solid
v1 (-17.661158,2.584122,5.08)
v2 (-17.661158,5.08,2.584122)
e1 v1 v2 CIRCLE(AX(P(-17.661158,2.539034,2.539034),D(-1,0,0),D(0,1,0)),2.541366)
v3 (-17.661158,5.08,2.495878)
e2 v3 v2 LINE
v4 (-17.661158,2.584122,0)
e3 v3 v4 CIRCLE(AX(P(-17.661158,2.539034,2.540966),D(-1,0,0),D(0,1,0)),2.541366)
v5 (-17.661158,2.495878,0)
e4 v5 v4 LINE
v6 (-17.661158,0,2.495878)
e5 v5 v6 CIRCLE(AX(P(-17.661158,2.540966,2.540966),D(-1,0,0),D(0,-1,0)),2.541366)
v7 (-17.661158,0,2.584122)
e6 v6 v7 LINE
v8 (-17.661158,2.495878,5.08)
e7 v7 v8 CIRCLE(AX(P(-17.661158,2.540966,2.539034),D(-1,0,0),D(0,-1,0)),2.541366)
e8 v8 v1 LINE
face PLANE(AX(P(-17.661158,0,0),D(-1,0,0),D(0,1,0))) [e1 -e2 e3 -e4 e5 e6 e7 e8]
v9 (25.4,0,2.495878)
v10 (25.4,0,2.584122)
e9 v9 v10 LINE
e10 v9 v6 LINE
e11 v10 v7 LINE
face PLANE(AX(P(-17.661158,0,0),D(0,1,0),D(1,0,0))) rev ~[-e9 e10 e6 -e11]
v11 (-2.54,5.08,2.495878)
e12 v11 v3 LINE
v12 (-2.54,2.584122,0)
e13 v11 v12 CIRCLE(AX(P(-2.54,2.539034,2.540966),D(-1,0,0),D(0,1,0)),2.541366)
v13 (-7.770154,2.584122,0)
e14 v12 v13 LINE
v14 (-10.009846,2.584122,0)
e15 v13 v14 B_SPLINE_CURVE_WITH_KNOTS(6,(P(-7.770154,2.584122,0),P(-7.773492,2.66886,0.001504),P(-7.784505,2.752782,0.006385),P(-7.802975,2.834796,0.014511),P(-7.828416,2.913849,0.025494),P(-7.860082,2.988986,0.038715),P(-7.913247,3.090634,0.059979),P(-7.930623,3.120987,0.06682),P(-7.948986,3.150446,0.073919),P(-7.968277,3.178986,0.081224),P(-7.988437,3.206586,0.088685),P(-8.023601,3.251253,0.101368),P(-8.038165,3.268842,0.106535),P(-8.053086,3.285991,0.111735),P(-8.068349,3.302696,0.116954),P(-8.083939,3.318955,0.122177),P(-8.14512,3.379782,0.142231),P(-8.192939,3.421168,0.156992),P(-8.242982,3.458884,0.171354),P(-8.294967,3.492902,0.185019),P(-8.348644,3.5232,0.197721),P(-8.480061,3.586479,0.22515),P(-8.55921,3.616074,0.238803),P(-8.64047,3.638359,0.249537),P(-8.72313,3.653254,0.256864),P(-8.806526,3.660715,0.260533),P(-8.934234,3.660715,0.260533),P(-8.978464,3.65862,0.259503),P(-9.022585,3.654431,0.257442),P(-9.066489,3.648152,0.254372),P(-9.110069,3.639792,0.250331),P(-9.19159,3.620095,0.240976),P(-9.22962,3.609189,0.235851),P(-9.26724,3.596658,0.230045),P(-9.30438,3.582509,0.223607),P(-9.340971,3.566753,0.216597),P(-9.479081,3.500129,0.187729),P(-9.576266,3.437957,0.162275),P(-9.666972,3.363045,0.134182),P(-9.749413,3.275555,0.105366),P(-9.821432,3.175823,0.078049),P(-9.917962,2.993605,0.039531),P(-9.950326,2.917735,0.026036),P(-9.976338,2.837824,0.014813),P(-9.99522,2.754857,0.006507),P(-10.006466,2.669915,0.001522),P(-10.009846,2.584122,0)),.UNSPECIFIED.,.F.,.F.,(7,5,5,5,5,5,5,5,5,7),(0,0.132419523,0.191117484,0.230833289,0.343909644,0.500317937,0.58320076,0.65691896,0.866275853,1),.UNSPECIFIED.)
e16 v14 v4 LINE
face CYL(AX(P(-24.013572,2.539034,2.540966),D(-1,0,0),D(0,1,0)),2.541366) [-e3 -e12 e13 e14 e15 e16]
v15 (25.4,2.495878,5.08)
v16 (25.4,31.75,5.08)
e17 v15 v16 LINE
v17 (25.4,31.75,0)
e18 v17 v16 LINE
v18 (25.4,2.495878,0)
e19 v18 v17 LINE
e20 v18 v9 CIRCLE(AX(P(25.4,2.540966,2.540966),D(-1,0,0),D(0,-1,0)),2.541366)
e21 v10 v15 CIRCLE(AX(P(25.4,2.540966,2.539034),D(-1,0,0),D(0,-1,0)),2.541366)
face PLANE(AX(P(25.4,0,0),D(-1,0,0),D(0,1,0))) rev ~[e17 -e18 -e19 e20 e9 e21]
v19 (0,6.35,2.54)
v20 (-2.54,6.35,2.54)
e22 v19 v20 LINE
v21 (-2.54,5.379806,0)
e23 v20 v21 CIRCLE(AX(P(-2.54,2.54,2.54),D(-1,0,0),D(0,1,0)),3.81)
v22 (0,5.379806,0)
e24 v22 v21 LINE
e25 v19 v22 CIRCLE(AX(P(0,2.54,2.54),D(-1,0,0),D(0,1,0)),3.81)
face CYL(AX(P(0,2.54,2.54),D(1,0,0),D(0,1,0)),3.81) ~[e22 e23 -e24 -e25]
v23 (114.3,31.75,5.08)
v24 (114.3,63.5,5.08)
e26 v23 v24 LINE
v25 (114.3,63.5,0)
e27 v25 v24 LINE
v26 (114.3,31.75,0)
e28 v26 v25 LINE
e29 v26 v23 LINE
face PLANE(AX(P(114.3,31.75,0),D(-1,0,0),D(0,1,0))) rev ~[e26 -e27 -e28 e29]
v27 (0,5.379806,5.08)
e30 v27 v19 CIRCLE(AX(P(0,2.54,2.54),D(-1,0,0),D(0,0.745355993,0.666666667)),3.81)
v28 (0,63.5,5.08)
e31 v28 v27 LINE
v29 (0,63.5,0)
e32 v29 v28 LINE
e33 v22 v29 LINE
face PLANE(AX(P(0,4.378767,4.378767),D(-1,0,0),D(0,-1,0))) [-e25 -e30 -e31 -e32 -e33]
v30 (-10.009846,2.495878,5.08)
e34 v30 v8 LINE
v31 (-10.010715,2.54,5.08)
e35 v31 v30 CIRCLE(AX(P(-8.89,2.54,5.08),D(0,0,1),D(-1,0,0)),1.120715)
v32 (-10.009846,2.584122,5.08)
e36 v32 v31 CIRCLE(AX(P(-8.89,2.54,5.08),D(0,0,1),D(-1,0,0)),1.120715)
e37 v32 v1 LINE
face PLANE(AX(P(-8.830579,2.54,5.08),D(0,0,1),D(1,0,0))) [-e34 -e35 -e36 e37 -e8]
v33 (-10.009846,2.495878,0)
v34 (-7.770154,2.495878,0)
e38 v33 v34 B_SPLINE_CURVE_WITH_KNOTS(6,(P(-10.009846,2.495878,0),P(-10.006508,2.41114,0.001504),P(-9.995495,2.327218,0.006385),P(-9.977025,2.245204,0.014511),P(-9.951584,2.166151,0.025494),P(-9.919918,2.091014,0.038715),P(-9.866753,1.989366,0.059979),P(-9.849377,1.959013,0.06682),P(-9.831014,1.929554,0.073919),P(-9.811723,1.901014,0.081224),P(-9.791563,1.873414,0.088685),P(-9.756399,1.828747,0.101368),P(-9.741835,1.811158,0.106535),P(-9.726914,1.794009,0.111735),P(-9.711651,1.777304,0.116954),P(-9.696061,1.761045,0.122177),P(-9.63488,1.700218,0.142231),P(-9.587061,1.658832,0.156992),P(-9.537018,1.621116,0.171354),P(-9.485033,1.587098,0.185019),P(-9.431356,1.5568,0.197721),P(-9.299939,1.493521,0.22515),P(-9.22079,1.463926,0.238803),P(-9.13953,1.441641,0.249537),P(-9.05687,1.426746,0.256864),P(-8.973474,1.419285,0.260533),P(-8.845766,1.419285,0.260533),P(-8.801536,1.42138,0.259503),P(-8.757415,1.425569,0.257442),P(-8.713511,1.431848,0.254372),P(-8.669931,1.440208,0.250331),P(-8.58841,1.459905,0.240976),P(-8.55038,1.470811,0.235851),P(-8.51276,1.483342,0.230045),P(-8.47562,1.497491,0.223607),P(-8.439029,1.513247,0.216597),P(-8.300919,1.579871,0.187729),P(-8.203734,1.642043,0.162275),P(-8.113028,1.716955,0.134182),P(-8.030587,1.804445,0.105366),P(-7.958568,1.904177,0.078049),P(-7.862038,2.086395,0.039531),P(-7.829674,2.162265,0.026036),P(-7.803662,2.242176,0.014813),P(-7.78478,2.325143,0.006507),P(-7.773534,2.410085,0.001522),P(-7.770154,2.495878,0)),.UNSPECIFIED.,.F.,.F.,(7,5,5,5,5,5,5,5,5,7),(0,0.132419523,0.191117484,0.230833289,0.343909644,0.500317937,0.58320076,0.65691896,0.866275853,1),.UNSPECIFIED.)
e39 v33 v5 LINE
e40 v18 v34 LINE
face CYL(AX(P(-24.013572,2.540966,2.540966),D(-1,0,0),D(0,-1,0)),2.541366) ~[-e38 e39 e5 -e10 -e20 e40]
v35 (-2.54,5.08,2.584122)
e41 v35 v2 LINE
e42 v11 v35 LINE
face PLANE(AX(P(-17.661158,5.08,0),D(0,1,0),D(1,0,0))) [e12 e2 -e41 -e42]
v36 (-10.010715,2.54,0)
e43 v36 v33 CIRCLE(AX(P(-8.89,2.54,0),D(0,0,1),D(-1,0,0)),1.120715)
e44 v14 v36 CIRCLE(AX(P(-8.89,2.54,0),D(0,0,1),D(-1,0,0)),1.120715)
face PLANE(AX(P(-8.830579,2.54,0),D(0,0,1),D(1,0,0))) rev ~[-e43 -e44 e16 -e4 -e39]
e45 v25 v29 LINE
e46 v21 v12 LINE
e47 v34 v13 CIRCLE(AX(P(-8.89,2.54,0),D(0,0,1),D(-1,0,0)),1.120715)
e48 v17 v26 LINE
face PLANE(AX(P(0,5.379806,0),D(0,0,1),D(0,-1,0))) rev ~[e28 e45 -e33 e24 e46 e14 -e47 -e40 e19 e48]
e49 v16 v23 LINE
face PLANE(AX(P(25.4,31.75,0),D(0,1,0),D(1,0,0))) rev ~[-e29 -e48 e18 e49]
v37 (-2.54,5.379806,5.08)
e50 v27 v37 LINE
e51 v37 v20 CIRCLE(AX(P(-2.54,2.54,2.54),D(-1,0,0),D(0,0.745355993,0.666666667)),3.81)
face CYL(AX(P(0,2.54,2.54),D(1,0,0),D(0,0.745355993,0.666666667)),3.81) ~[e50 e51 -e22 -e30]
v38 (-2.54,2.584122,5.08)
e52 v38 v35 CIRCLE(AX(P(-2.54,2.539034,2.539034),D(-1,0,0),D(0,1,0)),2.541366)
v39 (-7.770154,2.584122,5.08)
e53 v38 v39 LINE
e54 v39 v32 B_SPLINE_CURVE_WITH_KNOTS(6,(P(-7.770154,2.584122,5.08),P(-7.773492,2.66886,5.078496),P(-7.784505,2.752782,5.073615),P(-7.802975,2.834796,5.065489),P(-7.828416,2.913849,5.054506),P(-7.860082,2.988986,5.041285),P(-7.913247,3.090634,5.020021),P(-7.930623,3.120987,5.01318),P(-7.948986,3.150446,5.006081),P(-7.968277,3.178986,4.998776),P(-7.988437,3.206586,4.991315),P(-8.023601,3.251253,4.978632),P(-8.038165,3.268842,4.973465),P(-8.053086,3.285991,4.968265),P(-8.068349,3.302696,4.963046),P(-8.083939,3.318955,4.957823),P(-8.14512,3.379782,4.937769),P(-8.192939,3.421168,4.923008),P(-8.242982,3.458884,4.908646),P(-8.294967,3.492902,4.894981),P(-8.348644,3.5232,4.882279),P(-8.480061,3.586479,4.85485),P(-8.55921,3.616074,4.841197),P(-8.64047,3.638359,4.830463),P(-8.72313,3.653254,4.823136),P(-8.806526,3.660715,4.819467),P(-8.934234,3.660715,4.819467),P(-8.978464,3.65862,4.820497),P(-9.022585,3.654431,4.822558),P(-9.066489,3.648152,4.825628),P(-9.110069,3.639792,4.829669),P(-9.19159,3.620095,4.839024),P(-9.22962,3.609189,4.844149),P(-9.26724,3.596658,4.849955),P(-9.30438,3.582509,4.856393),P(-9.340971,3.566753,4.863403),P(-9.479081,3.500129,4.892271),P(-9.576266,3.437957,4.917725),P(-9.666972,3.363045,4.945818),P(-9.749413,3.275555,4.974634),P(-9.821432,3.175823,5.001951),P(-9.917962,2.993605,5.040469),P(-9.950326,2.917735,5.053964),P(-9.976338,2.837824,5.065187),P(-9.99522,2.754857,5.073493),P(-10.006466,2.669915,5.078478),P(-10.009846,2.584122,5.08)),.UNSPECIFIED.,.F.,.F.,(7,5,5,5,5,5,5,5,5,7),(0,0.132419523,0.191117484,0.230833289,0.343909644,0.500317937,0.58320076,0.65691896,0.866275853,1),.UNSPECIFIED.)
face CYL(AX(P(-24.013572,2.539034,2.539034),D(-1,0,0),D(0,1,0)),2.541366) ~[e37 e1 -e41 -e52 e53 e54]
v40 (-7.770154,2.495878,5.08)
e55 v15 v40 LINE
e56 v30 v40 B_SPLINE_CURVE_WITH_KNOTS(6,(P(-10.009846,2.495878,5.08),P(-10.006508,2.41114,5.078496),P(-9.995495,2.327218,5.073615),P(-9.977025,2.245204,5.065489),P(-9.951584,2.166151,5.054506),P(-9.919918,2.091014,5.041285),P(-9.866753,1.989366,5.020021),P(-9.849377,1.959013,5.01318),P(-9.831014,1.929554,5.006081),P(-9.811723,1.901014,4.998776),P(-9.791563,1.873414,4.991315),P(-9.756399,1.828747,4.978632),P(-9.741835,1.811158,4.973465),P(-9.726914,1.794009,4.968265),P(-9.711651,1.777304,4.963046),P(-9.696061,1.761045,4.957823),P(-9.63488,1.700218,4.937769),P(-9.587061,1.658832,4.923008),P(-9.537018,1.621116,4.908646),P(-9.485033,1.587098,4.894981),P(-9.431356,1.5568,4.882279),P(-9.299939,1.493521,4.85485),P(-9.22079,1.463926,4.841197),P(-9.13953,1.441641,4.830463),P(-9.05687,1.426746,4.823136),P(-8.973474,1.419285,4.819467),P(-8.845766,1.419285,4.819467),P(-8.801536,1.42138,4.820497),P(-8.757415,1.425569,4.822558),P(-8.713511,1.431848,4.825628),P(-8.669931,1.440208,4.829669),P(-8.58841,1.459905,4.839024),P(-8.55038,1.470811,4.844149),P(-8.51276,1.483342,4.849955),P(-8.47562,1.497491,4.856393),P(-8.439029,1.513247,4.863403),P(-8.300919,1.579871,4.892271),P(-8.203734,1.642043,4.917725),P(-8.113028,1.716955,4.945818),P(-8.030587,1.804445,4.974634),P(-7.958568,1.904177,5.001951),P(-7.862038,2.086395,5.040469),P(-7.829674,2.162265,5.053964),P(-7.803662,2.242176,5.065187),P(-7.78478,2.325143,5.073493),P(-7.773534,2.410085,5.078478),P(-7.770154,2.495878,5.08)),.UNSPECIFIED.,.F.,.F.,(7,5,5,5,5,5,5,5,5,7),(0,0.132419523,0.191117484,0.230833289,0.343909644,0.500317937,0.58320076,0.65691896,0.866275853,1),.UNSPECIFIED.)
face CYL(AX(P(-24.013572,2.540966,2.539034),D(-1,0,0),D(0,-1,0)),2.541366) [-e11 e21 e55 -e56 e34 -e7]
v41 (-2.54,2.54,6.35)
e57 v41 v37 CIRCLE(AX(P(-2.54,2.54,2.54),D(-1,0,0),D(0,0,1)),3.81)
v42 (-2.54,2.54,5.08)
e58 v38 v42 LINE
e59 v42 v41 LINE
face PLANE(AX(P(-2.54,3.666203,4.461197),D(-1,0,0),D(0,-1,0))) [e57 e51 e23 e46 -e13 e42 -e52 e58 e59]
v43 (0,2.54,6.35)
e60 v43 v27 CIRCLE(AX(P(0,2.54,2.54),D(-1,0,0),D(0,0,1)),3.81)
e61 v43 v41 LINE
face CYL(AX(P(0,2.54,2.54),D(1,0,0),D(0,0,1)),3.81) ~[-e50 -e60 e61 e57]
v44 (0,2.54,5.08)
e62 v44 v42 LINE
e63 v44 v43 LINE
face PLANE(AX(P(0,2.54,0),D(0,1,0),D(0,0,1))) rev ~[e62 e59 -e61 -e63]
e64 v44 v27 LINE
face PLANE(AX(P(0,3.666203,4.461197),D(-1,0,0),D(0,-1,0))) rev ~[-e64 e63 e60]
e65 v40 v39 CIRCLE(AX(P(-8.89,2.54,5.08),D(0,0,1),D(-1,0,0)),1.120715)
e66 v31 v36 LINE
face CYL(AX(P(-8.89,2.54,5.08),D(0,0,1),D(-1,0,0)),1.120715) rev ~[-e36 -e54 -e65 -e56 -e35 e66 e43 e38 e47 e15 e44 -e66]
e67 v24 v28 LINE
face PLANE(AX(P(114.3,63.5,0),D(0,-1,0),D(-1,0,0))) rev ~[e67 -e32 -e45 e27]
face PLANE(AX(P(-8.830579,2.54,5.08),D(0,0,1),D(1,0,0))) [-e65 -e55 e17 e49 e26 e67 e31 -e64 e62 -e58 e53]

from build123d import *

# Parameters (mm, degrees)
F0_W        = 17.6611579955
F0_H        = 5.08
F1_DEPTH    = 5.08
F2_T1_DEPTH = 55.76598658
F2_T3_DEPTH = 24.0135722877
F4_DEPTH    = 5.081
F6_DEPTH    = 2.54


# Not quite as in the source:
# - a fillet or chamfer that OpenCascade refuses, or shapes differently, is made with other operations: its cross-section is extruded or revolved along the edge and cut away or added


with BuildPart() as f1:
    # F0 (on Top) → F1 (new body)
    with BuildSketch(Plane.XY):
        with Locations((-8.8305789977, 2.54)):
            Rectangle(F0_W, F0_H)
        Polygon((0, 5.08), (0, 0), (25.4, 0), (25.4, 31.75), (88.9, 31.75), (114.3, 31.75), (114.3, 63.5), (0, 63.5), (0, 28.7528), align=None)
    extrude(amount=F1_DEPTH)

    # F2: fillet of radius 2.54 on 4 edges, made by hand

    # F2_s2 → F2_t1 (cut)
    with BuildSketch(Plane.YZ.offset(-24.0135722877)):
        with BuildLine():
            ThreePointArc((-0.0004, 2.5390343146), (0.7439487758, 4.3360512242), (2.5409656854, 5.0804))
            Line((2.5409656854, 5.0804), (2.5409656854, 5.3345365685))
            ThreePointArc((2.5409656854, 5.3345365685), (1.2704828427, 5.3341365685), (0, 5.3341365685))
            Line((0, 5.3341365685), (-0.2541365685, 5.08))
            ThreePointArc((-0.2541365685, 5.08), (-0.2541365685, 3.8095171573), (-0.2545365685, 2.5390343146))
            Line((-0.2545365685, 2.5390343146), (-0.0004, 2.5390343146))
        make_face()
        with BuildLine():
            ThreePointArc((-0.0004, 2.5409656854), (0.7439487758, 0.7439487758), (2.5409656854, -0.0004))
            Line((2.5409656854, -0.0004), (2.5409656854, -0.2545365685))
            ThreePointArc((2.5409656854, -0.2545365685), (1.2704828427, -0.2541365685), (0, -0.2541365685))
            Line((0, -0.2541365685), (-0.2541365685, 0))
            ThreePointArc((-0.2541365685, 0), (-0.2541365685, 1.2704828427), (-0.2545365685, 2.5409656854))
            Line((-0.2545365685, 2.5409656854), (-0.0004, 2.5409656854))
        make_face()
    extrude(amount=F2_T1_DEPTH, mode=Mode.SUBTRACT)

    # F2_s4 → F2_t3 (cut)
    with BuildSketch(Plane.YZ.offset(-24.0135722877)):
        with BuildLine():
            ThreePointArc((5.0804, 2.5390343146), (4.3360512242, 4.3360512242), (2.5390343146, 5.0804))
            Line((2.5390343146, 5.0804), (2.5390343146, 5.3345365685))
            ThreePointArc((2.5390343146, 5.3345365685), (3.8095171573, 5.3341365685), (5.08, 5.3341365685))
            Line((5.08, 5.3341365685), (5.3341365685, 5.08))
            ThreePointArc((5.3341365685, 5.08), (5.3341365685, 3.8095171573), (5.3345365685, 2.5390343146))
            Line((5.3345365685, 2.5390343146), (5.0804, 2.5390343146))
        make_face()
        with BuildLine():
            ThreePointArc((5.0804, 2.5409656854), (4.3360512242, 0.7439487758), (2.5390343146, -0.0004))
            Line((2.5390343146, -0.0004), (2.5390343146, -0.2545365685))
            ThreePointArc((2.5390343146, -0.2545365685), (3.8095171573, -0.2541365685), (5.08, -0.2541365685))
            Line((5.08, -0.2541365685), (5.3341365685, 0))
            ThreePointArc((5.3341365685, 0), (5.3341365685, 1.2704828427), (5.3345365685, 2.5409656854))
            Line((5.3345365685, 2.5409656854), (5.0804, 2.5409656854))
        make_face()
    extrude(amount=F2_T3_DEPTH, mode=Mode.SUBTRACT)

    # F3 (on face) → F4 (cut, through all)
    with BuildSketch(Plane.XY.offset(5.08)):
        with BuildLine():
            ThreePointArc((-7.7692847717, 2.54), (-8.89, 3.6607152283), (-10.0107152283, 2.54))
            Line((-10.0107152283, 2.54), (-7.7692847717, 2.54))
        make_face()
        with BuildLine():
            Line((-7.7692847717, 2.54), (-10.0107152283, 2.54))
            ThreePointArc((-10.0107152283, 2.54), (-8.89, 1.4192847717), (-7.7692847717, 2.54))
        make_face()
    extrude(amount=-F4_DEPTH, mode=Mode.SUBTRACT)

    # F5 (on face) → F6 (join)
    with BuildSketch(Plane(origin=(0, 0, 0), x_dir=(0, -1, 0), z_dir=(-1, 0, 0))):
        with BuildLine():
            Line((-2.54, 2.54), (-2.54, 6.35))
            ThreePointArc((-2.54, 6.35), (-4.0954259867, 6.0180382402), (-5.3798063314, 5.08))
            Line((-5.3798063314, 5.08), (-2.5841223678, 5.08))
            ThreePointArc((-2.5841223678, 5.08), (-4.3360512242, 4.3360512242), (-5.08, 2.5841223678))
            Line((-5.08, 2.5841223678), (-5.08, 2.54))
            Line((-5.08, 2.54), (-2.54, 2.54))
        make_face()
        with BuildLine():
            ThreePointArc((-6.35, 2.54), (-6.0991966876, 1.180507838), (-5.3798063314, 0))
            Line((-5.3798063314, 0), (-2.5841223678, 0))
            ThreePointArc((-2.5841223678, 0), (-4.3360512242, 0.7439487758), (-5.08, 2.4958776322))
            Line((-5.08, 2.4958776322), (-5.08, 2.54))
            Line((-5.08, 2.54), (-6.35, 2.54))
        make_face()
        with BuildLine():
            Line((-2.5841223678, 5.08), (-5.3798063314, 5.08))
            ThreePointArc((-5.3798063314, 5.08), (-6.0991966876, 3.899492162), (-6.35, 2.54))
            Line((-6.35, 2.54), (-5.08, 2.54))
            Line((-5.08, 2.54), (-5.08, 2.5841223678))
            ThreePointArc((-5.08, 2.5841223678), (-4.3360512242, 4.3360512242), (-2.5841223678, 5.08))
        make_face()
        with BuildLine():
            Line((-2.54, 0), (-2.54, 2.54))
            Line((-2.54, 2.54), (-5.08, 2.54))
            Line((-5.08, 2.54), (-5.08, 2.4958776322))
            ThreePointArc((-5.08, 2.4958776322), (-4.3360512242, 0.7439487758), (-2.5841223678, 0))
            Line((-2.5841223678, 0), (-2.54, 0))
        make_face()
    extrude(amount=F6_DEPTH)


solid = f1.part
